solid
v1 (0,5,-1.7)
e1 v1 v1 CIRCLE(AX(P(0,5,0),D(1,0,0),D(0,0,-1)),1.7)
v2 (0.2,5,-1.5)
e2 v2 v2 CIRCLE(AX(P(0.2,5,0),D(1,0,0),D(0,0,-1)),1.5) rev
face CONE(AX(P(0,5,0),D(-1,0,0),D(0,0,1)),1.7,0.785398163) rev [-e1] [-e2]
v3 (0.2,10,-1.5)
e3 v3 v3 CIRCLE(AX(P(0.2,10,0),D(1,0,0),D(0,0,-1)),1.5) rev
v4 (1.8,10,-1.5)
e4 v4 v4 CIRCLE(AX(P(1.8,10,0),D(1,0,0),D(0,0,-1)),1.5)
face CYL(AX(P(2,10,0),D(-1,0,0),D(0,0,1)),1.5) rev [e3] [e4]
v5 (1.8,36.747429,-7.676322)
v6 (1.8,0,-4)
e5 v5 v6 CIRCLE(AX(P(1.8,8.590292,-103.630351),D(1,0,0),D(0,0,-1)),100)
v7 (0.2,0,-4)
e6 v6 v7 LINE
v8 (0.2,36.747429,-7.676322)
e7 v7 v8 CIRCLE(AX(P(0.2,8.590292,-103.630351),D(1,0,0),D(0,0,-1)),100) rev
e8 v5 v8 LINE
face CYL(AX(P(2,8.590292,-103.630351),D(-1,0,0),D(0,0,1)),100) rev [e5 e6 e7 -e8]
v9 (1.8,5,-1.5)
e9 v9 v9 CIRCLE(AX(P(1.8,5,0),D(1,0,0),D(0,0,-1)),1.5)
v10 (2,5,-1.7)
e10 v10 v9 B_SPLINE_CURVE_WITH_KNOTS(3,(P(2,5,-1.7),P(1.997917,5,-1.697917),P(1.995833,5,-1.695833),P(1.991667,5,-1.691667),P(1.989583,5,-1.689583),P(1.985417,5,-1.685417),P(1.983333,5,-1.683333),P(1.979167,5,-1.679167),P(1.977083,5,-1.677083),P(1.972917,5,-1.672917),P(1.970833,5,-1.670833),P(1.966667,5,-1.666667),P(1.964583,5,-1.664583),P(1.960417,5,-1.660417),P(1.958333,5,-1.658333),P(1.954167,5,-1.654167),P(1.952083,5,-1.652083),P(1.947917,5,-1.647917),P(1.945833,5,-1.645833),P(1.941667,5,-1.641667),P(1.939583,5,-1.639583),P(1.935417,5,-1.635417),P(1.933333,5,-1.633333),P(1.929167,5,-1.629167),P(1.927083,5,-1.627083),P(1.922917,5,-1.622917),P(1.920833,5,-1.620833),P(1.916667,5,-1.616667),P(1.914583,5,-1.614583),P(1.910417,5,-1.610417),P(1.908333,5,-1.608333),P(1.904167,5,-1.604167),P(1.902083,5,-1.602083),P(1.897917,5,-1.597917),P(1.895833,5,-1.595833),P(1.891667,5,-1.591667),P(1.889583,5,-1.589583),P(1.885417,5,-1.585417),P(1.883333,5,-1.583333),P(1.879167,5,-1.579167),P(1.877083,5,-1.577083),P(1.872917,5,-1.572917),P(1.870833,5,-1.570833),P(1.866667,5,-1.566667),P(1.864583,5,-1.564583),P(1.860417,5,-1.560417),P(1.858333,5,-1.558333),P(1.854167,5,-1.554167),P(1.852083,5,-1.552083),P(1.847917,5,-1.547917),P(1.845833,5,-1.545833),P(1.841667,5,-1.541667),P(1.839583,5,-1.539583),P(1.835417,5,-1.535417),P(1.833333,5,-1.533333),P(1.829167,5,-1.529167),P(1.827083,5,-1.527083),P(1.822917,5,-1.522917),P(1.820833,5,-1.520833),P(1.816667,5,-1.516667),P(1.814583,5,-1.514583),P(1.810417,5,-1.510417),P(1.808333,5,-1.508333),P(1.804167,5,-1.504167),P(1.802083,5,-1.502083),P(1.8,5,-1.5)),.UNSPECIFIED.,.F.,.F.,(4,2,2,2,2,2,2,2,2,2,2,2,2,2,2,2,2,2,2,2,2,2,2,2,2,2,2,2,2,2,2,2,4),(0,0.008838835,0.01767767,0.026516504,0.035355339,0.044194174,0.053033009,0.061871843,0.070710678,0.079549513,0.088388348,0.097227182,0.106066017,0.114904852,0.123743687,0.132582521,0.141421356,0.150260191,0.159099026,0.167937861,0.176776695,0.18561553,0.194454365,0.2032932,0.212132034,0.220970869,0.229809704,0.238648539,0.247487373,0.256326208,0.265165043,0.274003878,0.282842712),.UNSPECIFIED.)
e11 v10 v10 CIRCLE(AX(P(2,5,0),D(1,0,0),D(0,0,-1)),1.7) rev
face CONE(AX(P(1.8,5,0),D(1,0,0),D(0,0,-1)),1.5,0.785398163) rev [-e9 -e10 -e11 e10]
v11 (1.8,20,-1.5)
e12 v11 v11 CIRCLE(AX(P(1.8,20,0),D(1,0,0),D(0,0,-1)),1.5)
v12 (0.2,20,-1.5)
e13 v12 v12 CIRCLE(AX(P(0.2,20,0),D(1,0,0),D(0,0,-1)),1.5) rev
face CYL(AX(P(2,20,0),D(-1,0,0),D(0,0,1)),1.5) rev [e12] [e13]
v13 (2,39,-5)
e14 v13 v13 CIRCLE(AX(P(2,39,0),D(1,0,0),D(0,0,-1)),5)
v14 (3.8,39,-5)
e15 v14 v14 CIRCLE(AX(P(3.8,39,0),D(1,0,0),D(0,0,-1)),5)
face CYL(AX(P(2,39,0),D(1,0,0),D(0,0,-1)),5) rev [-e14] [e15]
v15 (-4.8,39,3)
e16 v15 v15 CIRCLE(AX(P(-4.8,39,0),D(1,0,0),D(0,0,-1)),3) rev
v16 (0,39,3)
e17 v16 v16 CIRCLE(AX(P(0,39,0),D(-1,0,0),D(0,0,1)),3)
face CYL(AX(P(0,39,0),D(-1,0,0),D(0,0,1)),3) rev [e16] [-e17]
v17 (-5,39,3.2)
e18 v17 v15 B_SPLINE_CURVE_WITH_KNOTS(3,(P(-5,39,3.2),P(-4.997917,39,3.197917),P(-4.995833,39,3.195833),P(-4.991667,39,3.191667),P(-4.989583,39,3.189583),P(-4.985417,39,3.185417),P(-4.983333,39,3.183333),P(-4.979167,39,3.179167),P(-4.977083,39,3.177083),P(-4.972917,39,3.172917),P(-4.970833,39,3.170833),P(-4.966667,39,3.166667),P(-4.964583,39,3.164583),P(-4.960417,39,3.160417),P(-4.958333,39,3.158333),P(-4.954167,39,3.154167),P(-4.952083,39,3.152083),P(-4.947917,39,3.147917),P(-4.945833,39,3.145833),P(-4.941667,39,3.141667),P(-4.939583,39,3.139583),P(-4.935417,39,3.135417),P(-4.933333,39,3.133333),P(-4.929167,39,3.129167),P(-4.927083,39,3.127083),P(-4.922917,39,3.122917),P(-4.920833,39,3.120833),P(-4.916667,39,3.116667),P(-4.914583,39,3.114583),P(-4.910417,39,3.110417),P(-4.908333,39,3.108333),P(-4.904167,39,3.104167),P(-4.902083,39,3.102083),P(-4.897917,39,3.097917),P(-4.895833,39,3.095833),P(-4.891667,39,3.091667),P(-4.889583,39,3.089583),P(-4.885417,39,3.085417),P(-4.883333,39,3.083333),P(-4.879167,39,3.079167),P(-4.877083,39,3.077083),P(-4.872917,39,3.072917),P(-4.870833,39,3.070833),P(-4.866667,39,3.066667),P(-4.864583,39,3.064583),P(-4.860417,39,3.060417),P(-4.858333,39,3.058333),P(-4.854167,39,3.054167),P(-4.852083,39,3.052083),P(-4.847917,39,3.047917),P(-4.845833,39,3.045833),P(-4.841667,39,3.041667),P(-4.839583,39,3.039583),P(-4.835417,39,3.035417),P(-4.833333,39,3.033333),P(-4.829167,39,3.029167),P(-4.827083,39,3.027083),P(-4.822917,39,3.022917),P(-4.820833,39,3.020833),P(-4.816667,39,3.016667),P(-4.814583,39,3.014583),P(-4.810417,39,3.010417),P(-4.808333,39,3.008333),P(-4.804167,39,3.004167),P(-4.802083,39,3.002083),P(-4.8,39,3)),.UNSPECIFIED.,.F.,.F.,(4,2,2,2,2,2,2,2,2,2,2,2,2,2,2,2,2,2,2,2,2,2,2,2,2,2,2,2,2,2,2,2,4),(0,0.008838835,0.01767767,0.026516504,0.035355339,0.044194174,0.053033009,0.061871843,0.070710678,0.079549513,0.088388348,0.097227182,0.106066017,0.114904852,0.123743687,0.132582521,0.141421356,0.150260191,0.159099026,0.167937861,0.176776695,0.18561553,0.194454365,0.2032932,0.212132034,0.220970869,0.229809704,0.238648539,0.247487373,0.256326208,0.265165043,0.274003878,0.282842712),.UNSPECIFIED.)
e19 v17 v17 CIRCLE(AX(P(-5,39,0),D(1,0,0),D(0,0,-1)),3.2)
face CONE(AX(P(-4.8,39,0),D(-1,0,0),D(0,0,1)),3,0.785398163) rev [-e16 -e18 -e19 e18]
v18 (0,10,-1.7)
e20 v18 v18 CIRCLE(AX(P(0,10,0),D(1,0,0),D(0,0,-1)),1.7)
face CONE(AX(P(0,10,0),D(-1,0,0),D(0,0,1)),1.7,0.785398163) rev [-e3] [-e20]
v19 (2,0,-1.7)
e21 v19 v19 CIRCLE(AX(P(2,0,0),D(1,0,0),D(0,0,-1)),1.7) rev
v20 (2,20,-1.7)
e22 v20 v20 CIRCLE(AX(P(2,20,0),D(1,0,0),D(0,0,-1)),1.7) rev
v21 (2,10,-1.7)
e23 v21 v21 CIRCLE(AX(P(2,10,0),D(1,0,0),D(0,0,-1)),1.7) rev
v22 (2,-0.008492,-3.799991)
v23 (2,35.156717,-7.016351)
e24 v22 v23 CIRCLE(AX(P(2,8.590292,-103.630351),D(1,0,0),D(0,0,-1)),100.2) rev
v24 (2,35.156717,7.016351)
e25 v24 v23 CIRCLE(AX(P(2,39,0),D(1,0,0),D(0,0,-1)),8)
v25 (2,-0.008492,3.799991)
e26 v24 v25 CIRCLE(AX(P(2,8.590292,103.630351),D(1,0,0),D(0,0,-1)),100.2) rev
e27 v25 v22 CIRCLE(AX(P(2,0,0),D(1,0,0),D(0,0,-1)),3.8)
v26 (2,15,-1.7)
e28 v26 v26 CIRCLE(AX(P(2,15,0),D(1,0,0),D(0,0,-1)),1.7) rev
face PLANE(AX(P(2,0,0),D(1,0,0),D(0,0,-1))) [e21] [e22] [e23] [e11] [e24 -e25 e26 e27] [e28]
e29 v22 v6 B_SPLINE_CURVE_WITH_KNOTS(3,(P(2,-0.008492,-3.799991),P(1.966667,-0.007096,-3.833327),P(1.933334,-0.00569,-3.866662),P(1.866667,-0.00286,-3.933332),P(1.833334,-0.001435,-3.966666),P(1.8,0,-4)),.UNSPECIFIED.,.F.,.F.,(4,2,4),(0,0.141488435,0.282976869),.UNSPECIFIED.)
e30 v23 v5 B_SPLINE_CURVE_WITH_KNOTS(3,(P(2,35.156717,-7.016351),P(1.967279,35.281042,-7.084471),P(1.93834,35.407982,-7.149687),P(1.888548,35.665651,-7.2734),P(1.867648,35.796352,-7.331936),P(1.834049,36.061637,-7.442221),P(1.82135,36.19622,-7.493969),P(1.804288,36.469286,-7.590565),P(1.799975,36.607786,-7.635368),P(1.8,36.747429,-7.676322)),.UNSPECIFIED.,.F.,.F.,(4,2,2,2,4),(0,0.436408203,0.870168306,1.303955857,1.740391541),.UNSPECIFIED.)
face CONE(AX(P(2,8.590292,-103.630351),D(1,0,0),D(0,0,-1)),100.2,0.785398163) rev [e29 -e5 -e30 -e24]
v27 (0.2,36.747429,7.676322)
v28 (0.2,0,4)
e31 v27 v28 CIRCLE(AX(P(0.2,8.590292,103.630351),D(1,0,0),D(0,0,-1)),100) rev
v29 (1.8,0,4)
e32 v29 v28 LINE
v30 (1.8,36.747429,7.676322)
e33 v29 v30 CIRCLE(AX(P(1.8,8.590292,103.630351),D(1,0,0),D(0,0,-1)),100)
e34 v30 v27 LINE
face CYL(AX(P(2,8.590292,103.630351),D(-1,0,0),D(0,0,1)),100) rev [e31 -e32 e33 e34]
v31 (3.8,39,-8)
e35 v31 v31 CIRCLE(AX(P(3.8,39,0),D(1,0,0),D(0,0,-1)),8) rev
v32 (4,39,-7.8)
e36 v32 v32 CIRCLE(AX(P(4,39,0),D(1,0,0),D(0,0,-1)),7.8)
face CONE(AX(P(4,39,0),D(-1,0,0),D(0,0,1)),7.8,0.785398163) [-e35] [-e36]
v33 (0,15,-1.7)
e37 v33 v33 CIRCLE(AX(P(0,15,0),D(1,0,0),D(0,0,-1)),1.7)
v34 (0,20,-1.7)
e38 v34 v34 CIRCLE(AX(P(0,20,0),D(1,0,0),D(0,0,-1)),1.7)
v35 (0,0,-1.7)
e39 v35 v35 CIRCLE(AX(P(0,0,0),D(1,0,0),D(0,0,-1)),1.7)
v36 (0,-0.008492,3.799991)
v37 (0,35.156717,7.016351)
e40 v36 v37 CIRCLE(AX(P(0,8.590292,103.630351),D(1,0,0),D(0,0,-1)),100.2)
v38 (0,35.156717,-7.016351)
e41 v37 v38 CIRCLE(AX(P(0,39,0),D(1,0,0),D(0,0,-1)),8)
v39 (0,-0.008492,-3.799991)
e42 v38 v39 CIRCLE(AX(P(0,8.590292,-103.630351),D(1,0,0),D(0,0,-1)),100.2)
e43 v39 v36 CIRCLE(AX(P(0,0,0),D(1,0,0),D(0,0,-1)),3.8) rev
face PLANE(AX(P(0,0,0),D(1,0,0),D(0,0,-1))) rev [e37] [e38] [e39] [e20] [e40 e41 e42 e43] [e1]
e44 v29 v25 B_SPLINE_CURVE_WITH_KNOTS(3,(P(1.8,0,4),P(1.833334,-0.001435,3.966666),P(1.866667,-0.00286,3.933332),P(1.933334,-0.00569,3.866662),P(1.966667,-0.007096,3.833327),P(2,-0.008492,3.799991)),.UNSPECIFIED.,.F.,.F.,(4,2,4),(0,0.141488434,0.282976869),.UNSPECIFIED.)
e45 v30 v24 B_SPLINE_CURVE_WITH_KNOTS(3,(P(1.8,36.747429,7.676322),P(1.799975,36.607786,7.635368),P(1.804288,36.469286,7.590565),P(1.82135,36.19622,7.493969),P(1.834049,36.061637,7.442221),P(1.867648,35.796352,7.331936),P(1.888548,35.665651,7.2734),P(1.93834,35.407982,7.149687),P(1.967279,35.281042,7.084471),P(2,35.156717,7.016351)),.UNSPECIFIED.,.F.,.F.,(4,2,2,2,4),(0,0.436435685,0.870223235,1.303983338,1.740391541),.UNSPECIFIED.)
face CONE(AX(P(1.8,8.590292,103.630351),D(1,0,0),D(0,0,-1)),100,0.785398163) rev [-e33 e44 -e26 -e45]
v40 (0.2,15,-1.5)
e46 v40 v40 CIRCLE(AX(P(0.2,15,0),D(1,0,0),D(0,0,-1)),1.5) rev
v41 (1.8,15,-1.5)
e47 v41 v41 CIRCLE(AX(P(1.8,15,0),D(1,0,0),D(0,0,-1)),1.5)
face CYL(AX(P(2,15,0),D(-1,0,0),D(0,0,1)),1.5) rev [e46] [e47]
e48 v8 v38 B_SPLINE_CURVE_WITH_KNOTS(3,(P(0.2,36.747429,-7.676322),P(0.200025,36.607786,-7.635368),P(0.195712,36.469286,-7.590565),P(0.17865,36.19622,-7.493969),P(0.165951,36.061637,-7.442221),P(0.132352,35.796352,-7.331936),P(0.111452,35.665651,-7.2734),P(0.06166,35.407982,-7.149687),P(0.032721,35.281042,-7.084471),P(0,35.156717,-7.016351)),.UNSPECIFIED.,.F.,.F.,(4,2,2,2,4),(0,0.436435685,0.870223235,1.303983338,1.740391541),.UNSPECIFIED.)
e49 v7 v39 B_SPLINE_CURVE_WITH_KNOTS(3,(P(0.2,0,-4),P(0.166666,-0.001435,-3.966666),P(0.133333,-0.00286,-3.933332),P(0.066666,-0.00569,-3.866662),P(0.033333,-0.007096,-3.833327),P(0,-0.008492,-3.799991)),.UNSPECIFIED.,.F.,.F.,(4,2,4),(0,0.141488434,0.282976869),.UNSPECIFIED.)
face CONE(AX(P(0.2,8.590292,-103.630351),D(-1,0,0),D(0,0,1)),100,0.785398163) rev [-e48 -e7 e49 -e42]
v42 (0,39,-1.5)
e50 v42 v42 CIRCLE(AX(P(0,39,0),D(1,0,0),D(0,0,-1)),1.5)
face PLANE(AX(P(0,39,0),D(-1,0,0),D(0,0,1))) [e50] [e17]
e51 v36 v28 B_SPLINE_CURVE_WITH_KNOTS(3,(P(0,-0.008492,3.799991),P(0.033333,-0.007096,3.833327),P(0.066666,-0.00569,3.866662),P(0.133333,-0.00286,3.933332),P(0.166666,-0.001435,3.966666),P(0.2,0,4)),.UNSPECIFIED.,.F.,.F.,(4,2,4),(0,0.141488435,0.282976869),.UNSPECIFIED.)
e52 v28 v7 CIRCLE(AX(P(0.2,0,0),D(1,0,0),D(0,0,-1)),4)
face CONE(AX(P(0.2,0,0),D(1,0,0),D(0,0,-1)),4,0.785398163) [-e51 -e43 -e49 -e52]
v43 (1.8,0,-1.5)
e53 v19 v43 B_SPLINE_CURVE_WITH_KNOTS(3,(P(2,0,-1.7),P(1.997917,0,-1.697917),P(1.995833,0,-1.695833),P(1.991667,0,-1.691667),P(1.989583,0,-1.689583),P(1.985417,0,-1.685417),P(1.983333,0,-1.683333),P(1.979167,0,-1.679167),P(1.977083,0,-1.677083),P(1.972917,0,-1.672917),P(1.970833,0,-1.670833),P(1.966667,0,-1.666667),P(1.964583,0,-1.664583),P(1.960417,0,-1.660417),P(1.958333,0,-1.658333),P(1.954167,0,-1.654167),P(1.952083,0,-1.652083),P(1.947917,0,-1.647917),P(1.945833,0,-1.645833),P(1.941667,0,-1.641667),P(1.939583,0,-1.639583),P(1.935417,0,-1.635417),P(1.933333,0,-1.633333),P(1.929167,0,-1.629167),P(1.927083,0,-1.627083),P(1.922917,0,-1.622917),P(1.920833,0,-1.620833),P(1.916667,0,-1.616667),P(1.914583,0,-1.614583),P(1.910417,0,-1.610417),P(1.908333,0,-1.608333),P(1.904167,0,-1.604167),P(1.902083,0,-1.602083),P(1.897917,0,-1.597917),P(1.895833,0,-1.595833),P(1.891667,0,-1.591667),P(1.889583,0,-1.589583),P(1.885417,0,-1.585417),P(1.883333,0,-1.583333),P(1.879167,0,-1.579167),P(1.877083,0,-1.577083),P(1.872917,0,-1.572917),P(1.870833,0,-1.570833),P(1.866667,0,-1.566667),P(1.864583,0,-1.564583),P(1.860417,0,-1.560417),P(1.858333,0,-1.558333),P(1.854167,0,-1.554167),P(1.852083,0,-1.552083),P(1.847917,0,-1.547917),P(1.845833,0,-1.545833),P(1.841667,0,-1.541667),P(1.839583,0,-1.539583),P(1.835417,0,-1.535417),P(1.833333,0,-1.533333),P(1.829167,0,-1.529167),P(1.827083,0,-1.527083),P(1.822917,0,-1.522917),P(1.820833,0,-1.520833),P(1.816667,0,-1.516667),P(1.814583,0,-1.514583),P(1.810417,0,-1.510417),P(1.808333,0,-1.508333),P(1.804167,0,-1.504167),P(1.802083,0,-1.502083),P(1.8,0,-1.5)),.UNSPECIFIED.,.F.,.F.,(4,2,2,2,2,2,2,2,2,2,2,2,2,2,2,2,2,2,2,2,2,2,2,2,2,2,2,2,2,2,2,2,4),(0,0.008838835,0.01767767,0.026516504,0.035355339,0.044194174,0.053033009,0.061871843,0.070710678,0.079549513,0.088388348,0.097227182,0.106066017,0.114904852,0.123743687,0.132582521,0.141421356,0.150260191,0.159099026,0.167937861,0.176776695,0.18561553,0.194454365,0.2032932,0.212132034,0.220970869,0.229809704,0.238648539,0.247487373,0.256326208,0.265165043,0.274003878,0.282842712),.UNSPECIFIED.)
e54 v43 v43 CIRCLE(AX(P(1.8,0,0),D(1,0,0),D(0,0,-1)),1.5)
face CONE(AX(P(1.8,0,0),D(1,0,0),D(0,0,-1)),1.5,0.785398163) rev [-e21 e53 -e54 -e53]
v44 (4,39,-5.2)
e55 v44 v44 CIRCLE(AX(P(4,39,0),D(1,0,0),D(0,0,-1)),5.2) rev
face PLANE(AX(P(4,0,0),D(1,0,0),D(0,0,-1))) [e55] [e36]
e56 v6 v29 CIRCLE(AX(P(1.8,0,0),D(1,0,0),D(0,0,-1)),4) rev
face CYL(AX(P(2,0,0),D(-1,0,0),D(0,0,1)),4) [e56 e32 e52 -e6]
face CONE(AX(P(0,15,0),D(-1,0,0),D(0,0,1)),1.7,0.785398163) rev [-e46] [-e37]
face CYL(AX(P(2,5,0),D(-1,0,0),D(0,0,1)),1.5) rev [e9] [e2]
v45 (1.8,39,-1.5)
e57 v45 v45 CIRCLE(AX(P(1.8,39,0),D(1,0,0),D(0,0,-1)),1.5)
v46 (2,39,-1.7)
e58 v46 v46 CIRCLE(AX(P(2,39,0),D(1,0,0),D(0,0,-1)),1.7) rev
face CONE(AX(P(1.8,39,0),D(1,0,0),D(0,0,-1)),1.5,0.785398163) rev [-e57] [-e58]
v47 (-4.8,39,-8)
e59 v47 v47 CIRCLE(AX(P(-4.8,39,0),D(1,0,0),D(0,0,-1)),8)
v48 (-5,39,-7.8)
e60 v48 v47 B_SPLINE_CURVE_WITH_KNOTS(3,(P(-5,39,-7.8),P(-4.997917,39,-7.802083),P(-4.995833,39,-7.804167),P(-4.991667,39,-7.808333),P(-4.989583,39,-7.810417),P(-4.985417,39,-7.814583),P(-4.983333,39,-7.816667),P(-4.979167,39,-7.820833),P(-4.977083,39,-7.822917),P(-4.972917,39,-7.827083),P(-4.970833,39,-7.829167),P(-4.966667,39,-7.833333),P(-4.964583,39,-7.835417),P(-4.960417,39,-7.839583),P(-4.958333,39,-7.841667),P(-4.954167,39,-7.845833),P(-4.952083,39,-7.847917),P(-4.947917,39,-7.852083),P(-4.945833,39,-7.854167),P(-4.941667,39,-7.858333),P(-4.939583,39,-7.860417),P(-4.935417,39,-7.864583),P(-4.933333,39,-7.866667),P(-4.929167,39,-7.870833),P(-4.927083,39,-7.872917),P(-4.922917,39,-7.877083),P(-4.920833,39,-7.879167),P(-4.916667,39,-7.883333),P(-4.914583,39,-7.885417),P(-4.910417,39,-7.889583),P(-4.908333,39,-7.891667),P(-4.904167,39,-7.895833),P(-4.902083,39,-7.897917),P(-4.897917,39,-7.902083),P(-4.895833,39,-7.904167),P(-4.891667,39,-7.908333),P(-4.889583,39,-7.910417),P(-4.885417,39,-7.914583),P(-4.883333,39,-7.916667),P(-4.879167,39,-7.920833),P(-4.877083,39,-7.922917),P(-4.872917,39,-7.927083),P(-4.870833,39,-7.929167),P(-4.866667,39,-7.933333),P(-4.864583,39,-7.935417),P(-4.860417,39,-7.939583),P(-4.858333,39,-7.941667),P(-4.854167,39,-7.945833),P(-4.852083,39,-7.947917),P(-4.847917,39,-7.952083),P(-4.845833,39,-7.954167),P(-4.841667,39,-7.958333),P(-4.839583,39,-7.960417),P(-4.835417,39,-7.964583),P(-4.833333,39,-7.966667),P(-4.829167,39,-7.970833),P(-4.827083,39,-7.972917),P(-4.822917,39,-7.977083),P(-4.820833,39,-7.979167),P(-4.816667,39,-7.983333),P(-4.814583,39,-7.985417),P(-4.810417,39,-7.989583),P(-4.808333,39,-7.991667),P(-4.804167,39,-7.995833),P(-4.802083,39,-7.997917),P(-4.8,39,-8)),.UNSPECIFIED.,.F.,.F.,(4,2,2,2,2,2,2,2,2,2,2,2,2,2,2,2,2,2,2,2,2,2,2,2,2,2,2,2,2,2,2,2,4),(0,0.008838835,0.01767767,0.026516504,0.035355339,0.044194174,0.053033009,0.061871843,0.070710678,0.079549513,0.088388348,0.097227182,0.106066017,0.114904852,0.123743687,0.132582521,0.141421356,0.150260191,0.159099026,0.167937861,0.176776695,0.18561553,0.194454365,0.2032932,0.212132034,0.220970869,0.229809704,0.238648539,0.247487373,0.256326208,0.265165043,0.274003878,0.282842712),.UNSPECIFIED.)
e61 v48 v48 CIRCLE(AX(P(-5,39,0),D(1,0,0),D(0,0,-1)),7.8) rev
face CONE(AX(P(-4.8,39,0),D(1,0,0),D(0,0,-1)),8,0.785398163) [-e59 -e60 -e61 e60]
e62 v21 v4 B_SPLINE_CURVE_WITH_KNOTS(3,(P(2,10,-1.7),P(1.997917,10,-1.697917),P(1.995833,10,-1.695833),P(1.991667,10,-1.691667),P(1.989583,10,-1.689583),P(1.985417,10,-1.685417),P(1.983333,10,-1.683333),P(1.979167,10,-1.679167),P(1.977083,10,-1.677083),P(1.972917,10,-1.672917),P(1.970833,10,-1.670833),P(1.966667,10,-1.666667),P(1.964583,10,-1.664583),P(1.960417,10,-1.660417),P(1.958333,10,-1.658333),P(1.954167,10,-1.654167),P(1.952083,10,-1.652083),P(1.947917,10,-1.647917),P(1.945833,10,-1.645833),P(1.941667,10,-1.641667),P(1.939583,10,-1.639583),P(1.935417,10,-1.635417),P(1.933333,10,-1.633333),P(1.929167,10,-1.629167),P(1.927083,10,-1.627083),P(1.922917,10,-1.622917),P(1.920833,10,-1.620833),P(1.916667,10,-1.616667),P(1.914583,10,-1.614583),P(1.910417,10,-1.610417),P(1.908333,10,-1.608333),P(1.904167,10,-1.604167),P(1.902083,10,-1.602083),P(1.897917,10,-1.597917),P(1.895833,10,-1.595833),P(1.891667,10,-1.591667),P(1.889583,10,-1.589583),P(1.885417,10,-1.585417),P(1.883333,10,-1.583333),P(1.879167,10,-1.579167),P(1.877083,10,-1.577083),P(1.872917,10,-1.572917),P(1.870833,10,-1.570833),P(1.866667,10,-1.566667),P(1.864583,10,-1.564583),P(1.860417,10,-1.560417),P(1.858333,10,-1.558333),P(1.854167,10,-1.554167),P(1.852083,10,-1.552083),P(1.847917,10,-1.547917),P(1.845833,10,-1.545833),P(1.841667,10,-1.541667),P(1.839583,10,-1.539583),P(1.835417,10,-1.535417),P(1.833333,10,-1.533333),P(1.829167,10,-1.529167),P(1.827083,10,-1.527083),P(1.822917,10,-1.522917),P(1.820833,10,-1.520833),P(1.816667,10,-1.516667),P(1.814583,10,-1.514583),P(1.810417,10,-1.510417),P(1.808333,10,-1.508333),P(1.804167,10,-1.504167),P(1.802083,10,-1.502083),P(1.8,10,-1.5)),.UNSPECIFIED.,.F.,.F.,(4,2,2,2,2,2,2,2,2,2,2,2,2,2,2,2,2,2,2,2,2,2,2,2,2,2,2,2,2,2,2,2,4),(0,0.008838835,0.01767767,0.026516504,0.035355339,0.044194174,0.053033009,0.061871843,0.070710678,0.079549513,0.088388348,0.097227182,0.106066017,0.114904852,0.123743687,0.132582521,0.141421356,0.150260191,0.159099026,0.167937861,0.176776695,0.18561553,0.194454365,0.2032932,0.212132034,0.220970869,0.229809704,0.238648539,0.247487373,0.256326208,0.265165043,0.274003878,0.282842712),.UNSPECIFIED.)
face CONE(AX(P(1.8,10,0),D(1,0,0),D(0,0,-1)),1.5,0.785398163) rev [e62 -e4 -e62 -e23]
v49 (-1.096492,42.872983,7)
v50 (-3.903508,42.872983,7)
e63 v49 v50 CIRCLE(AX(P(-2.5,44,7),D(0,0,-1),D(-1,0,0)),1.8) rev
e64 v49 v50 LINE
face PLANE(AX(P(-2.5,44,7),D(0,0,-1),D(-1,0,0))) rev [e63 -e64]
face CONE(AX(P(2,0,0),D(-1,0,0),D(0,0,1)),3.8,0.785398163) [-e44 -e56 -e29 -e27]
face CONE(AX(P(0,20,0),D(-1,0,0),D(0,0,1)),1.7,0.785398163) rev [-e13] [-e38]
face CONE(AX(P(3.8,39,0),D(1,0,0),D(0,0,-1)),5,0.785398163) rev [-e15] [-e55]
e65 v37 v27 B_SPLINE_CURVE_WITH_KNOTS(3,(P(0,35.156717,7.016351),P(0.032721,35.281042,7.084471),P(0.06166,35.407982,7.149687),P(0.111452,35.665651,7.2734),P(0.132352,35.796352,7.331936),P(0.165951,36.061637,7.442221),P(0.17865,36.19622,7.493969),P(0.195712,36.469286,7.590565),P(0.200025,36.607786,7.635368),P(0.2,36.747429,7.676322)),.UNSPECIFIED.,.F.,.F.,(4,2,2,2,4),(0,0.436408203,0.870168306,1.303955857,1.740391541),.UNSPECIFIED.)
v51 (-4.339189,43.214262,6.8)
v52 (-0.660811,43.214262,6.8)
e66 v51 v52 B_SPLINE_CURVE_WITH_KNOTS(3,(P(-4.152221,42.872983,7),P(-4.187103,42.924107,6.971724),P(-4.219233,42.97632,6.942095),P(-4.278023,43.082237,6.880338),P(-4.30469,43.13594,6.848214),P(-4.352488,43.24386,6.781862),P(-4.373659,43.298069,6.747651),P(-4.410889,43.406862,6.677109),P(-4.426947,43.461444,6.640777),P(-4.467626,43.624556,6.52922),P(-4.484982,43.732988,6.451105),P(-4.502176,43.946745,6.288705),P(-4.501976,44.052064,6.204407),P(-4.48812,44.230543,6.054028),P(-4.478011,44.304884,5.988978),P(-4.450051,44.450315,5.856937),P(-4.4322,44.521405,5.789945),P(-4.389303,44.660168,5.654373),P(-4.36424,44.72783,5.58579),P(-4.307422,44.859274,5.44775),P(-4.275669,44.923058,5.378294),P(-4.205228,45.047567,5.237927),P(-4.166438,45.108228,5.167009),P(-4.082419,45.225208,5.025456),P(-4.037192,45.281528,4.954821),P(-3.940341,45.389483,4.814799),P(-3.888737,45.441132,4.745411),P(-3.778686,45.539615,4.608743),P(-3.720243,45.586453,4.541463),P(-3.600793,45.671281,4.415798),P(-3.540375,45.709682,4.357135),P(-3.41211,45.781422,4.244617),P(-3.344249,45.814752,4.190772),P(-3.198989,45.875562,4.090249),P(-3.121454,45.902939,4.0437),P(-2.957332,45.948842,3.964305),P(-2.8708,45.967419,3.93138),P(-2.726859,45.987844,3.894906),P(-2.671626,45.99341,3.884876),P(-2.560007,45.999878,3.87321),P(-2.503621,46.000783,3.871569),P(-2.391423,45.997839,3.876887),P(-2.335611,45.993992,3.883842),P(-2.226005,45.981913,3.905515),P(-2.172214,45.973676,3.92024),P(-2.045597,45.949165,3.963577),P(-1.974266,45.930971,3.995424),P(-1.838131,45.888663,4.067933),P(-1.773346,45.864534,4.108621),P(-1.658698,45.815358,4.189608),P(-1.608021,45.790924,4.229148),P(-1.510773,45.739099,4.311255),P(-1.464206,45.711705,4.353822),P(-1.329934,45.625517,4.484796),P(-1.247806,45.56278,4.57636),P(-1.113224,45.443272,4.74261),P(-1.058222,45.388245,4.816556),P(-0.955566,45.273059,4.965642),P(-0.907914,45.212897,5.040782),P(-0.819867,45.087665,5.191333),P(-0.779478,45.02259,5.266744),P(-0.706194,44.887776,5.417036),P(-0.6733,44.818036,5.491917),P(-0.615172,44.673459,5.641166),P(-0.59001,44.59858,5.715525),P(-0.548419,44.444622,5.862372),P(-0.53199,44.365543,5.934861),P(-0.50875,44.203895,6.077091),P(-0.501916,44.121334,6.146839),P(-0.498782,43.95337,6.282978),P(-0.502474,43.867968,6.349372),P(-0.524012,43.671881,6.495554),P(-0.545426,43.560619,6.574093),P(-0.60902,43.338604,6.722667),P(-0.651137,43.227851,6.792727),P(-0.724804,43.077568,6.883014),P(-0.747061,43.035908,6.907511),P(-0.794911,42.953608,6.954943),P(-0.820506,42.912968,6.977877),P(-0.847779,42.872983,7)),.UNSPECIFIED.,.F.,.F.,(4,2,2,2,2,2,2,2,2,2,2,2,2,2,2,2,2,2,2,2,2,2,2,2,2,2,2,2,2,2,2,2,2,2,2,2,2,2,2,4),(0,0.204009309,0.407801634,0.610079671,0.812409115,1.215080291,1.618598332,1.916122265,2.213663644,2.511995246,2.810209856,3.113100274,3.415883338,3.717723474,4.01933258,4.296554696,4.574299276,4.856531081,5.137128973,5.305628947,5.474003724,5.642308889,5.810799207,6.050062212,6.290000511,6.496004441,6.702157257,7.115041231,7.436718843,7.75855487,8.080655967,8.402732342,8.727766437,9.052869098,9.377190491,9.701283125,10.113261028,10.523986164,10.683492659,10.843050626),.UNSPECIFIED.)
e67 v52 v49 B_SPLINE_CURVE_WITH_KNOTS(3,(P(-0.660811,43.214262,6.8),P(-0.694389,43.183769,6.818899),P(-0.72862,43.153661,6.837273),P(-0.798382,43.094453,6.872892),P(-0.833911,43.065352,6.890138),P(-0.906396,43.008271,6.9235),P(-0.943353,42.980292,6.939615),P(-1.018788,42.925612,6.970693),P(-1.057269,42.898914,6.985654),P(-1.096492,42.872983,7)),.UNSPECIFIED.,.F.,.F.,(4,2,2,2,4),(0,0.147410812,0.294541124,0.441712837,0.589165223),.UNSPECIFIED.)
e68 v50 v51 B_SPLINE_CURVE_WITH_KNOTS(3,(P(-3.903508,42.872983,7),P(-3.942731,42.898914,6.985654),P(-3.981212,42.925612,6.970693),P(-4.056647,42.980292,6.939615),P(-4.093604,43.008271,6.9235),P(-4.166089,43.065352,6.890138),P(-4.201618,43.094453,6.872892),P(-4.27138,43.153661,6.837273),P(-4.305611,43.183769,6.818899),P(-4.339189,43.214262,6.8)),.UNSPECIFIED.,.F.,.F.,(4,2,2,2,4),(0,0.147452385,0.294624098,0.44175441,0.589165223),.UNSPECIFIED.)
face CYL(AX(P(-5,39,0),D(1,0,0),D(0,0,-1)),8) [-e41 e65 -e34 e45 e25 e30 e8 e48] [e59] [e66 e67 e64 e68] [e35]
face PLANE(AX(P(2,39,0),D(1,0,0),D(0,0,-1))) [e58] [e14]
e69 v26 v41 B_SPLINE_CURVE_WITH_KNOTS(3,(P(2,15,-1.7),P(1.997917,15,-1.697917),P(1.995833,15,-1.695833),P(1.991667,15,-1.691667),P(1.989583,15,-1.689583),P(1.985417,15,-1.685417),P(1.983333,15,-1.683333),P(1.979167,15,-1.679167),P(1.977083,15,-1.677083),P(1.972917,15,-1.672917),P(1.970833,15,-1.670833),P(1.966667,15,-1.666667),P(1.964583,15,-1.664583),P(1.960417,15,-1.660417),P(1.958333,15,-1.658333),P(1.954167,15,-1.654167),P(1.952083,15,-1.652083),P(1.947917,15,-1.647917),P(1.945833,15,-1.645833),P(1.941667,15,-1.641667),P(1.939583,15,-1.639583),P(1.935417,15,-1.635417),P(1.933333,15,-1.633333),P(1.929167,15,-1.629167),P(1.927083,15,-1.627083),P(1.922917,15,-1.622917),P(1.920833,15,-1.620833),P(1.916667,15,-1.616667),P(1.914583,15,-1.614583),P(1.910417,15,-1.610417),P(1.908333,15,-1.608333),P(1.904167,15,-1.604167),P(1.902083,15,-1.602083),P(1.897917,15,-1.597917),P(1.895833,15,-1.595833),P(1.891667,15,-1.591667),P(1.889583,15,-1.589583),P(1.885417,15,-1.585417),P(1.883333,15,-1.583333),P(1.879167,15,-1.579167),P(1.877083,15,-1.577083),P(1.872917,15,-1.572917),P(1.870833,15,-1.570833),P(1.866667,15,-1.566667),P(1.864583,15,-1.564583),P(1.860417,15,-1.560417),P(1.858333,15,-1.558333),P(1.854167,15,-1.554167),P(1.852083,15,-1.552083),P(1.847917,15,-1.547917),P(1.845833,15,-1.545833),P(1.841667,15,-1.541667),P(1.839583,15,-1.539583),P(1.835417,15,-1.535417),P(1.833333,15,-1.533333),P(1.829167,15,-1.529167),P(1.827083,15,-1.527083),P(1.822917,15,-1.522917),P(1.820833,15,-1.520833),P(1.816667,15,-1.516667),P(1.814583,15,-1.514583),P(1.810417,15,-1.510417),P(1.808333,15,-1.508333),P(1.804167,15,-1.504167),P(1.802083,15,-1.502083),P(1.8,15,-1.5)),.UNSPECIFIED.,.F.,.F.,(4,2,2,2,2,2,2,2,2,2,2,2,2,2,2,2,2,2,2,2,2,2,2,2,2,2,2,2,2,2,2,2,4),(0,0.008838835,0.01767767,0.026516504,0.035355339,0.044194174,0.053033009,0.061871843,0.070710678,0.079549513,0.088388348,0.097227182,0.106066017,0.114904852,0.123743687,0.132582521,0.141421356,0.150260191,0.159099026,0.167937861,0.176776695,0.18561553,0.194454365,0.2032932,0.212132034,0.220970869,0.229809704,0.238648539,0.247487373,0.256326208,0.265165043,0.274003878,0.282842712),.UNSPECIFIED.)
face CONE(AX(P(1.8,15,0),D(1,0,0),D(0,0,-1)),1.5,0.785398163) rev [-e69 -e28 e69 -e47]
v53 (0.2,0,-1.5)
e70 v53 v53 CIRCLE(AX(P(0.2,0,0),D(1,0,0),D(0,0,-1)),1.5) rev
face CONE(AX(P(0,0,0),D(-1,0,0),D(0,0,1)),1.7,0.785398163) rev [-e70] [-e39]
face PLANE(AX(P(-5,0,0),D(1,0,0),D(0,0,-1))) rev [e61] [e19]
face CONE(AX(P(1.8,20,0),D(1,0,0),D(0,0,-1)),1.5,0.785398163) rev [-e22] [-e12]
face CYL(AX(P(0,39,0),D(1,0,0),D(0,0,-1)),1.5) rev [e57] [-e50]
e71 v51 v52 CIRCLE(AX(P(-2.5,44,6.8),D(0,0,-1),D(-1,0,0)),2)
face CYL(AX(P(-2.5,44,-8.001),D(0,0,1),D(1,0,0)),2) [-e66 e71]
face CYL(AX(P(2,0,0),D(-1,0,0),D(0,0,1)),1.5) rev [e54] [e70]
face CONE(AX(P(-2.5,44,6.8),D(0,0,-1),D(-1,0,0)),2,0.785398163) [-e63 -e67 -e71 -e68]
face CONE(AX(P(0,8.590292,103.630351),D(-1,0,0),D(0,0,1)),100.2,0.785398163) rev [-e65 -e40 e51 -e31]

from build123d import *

# Parameters (mm, degrees)
EXTRUDE_1_DEPTH      = 2
EXTRUDE_2_DEPTH      = 4
EXTRUDE_2_DEPTH_BACK = 5
SKETCH_3_R           = 5
CUT_EXTRUDE_1_DEPTH  = 2
SKETCH_4_R           = 1.5
CUT_EXTRUDE_2_DEPTH  = 2
SKETCH_5_R           = 3
CUT_EXTRUDE_3_DEPTH  = 5
EXTRUDE_3_REACH      = 51.588
CHAMFER_1_SIZE       = 0.2
CHAMFER_2_SIZE       = 0.2
CHAMFER_3_SIZE       = 0.2
CHAMFER_4_ANGLE      = 180
CHAMFER_5_SIZE       = 0.2


with BuildPart() as part:
    # 草图1 → 凸台-拉伸1 (new body)
    with BuildSketch(Plane(origin=(0, 0, 0), x_dir=(0, 0, -1), z_dir=(1, 0, 0))):
        with BuildLine():
            ThreePointArc((-4, 0), (-2.828427125, -2.828427125), (0, -4))
            Line((0, -4), (0, -1.5))
            ThreePointArc((0, -1.5), (-1.5, 0), (0, 1.5))
            Line((0, 1.5), (0, 3.5))
            ThreePointArc((0, 3.5), (-1.5, 5), (0, 6.5))
            Line((0, 6.5), (0, 8.5))
            ThreePointArc((0, 8.5), (-1.5, 10), (0, 11.5))
            Line((0, 11.5), (0, 13.5))
            ThreePointArc((0, 13.5), (-1.5, 15), (0, 16.5))
            Line((0, 16.5), (0, 18.5))
            ThreePointArc((0, 18.5), (-1.5, 20), (0, 21.5))
            Line((0, 21.5), (0, 31))
            ThreePointArc((0, 31), (-4.794759251, 32.596072789), (-7.67632231, 36.747429069))
            ThreePointArc((-7.67632231, 36.747429069), (-4.127055678, 18.544898625), (-4, 0))
        make_face()
        with BuildLine():
            Line((0, -1.5), (0, -4))
            ThreePointArc((0, -4), (2.828427125, -2.828427125), (4, 0))
            ThreePointArc((4, 0), (4.127055678, 18.544898625), (7.67632231, 36.747429069))
            ThreePointArc((7.67632231, 36.747429069), (4.794759251, 32.596072789), (0, 31))
            Line((0, 31), (0, 21.5))
            ThreePointArc((0, 21.5), (1.060660172, 21.060660172), (1.5, 20))
            ThreePointArc((1.5, 20), (1.060660172, 18.939339828), (0, 18.5))
            Line((0, 18.5), (0, 16.5))
            ThreePointArc((0, 16.5), (1.060660172, 16.060660172), (1.5, 15))
            ThreePointArc((1.5, 15), (1.060660172, 13.939339828), (0, 13.5))
            Line((0, 13.5), (0, 11.5))
            ThreePointArc((0, 11.5), (1.060660172, 11.060660172), (1.5, 10))
            ThreePointArc((1.5, 10), (1.060660172, 8.939339828), (0, 8.5))
            Line((0, 8.5), (0, 6.5))
            ThreePointArc((0, 6.5), (1.060660172, 6.060660172), (1.5, 5))
            ThreePointArc((1.5, 5), (1.060660172, 3.939339828), (0, 3.5))
            Line((0, 3.5), (0, 1.5))
            ThreePointArc((0, 1.5), (1.060660172, 1.060660172), (1.5, 0))
            ThreePointArc((1.5, 0), (1.060660172, -1.060660172), (0, -1.5))
        make_face()
    extrude(amount=EXTRUDE_1_DEPTH)

    # 草图2 → 凸台-拉伸2 (add, two sides: drawn at the far end of the back side and taken through both)
    with BuildSketch(Plane(origin=(0, 0, 0), x_dir=(0, 0, -1), z_dir=(1, 0, 0)).offset(-EXTRUDE_2_DEPTH_BACK)):
        with BuildLine():
            ThreePointArc((0, 47), (-8, 39), (0, 31))
            Line((0, 31), (0, 47))
        make_face()
        with BuildLine():
            Line((0, 47), (0, 31))
            ThreePointArc((0, 31), (5.656854249, 33.343145751), (8, 39))
            ThreePointArc((8, 39), (5.656854249, 44.656854249), (0, 47))
        make_face()
    extrude(amount=EXTRUDE_2_DEPTH + EXTRUDE_2_DEPTH_BACK)

    # 草图3 → 切除-拉伸1 (cut)
    with BuildSketch(Plane(origin=(4, 0, 0), x_dir=(0, 0, -1), z_dir=(1, 0, 0))):
        with Locations((0, 39)):
            Circle(SKETCH_3_R)
    extrude(amount=-CUT_EXTRUDE_1_DEPTH, mode=Mode.SUBTRACT)

    # 草图4 → 切除-拉伸2 (cut)
    with BuildSketch(Plane(origin=(2, 0, 0), x_dir=(0, 0, -1), z_dir=(1, 0, 0))):
        with Locations((0, 39)):
            Circle(SKETCH_4_R)
    extrude(amount=-CUT_EXTRUDE_2_DEPTH, mode=Mode.SUBTRACT)

    # 草图5 → 切除-拉伸3 (cut)
    with BuildSketch(Plane.ZY.offset(5)):
        with Locations((0, 39)):
            Circle(SKETCH_5_R)
    extrude(amount=-CUT_EXTRUDE_3_DEPTH, mode=Mode.SUBTRACT)

    # 草图7 → 凸台-拉伸3 (add, up to next)
    with BuildSketch(Plane.XY.offset(7), mode=Mode.PRIVATE) as extrude_3_sk1:
        with BuildLine():
            Line((-4.005881134, 42.683822956), (-0.994118866, 42.683822956))
            ThreePointArc((-0.994118866, 42.683822956), (-2.5, 46), (-4.005881134, 42.683822956))
        make_face()
    extrude_3_tool1 = extrude(extrude_3_sk1.sketch, amount=-EXTRUDE_3_REACH, mode=Mode.PRIVATE) - part.part
    add(extrude_3_tool1.solids().sort_by_distance((-2.5, 44.204391, 7))[0])

    # 倒角1
    chamfer_1_edges = [part.edges().sort_by_distance(p)[0] for p in [
        (-5, 39, -3),
        (4, 31, 0),
        (-5, 31, 0),
        (-2.5, 46, 7),
        (4, 39, 5),
    ]]
    chamfer(chamfer_1_edges, length=CHAMFER_1_SIZE)

    # 倒角2
    chamfer_2_edges = [part.edges().sort_by_distance(p)[0] for p in [
        (2, 1.5, 0),
        (0, 21.5, 0),
        (0, 16.5, 0),
        (0, 11.5, 0),
        (2, 6.5, 0),
        (0, 6.5, 0),
        (0, 1.5, 0),
        (2, 11.5, 0),
        (2, 16.5, 0),
        (2, 21.5, 0),
    ]]
    chamfer(chamfer_2_edges, length=CHAMFER_2_SIZE)

    # 倒角3
    # the kernel refuses this chamfer: 0.2 mm, written as the material it takes off along each edge
    with BuildSketch(Plane(origin=(0, 8.590292429, 103.630351179), x_dir=(0, 0.3061524264248754, -0.9519825060336777), z_dir=(0, 0.9519825060336777, 0.3061524264248754))) as chamfer_3_piece_1_section:
        Polygon((100 + CHAMFER_3_SIZE, 0), (100, -CHAMFER_3_SIZE), (100, 0), align=None)
    chamfer_3_piece_1 = revolve(axis=Axis((0, 8.590292429, 103.630351179), (-1, 0, 0)), revolution_arc=23.639557958, mode=Mode.PRIVATE)
    chamfer_3_piece_1 = chamfer_3_piece_1 - Plane(origin=(0, 39, 0), x_dir=(0, 1, 0), z_dir=(-1, 0, 0)) * Cylinder(8, 401, mode=Mode.PRIVATE)
    add(chamfer_3_piece_1, mode=Mode.SUBTRACT)
    with BuildSketch(Plane(origin=(0, 8.590292429, -103.630351179), x_dir=(0, -0.10126549371899889, 0.9948594371979629), z_dir=(0, -0.9948594371979629, -0.10126549371899889))) as chamfer_3_piece_2_section:
        Polygon((100 + CHAMFER_3_SIZE, 0), (100, -CHAMFER_3_SIZE), (100, 0), align=None)
    chamfer_3_piece_2 = revolve(axis=Axis((0, 8.590292429, -103.630351179), (-1, 0, 0)), revolution_arc=23.639557958, mode=Mode.PRIVATE)
    chamfer_3_piece_2 = chamfer_3_piece_2 - Plane(origin=(0, 39, 0), x_dir=(0, 1, 0), z_dir=(-1, 0, 0)) * Cylinder(8, 401, mode=Mode.PRIVATE)
    add(chamfer_3_piece_2, mode=Mode.SUBTRACT)
    with BuildSketch(Plane(origin=(2, 8.590292429, -103.630351179), x_dir=(0, -0.10126549371899889, 0.9948594371979629), z_dir=(0, -0.9948594371979629, -0.10126549371899889))) as chamfer_3_piece_3_section:
        Polygon((100, CHAMFER_3_SIZE), (100 + CHAMFER_3_SIZE, 0), (100, 0), align=None)
    chamfer_3_piece_3 = revolve(axis=Axis((2, 8.590292429, -103.630351179), (-1, 0, 0)), revolution_arc=23.639557958, mode=Mode.PRIVATE)
    chamfer_3_piece_3 = chamfer_3_piece_3 - Plane(origin=(2, 39, 0), x_dir=(0, 1, 0), z_dir=(-1, 0, 0)) * Cylinder(8, 401, mode=Mode.PRIVATE)
    add(chamfer_3_piece_3, mode=Mode.SUBTRACT)
    with BuildSketch(Plane(origin=(2, 8.590292429, 103.630351179), x_dir=(0, 0.3061524264248754, -0.9519825060336777), z_dir=(0, 0.9519825060336777, 0.3061524264248754))) as chamfer_3_piece_4_section:
        Polygon((100, CHAMFER_3_SIZE), (100 + CHAMFER_3_SIZE, 0), (100, 0), align=None)
    chamfer_3_piece_4 = revolve(axis=Axis((2, 8.590292429, 103.630351179), (-1, 0, 0)), revolution_arc=23.639557958, mode=Mode.PRIVATE)
    chamfer_3_piece_4 = chamfer_3_piece_4 - Plane(origin=(2, 39, 0), x_dir=(0, 1, 0), z_dir=(-1, 0, 0)) * Cylinder(8, 401, mode=Mode.PRIVATE)
    add(chamfer_3_piece_4, mode=Mode.SUBTRACT)

    # 倒角4: read off the stored shape, not the designer's step
    # 倒角4 outline → 倒角4 (revolve, cut)
    with BuildSketch(Plane.ZX):
        Polygon((4, 2), (3.8, 2), (4, 1.8), align=None)
        Polygon((4, 0), (4, 0.2), (3.8, 0), align=None)
    revolve(axis=Axis((0, 0, 0), (1, 0, 0)), revolution_arc=CHAMFER_4_ANGLE, mode=Mode.SUBTRACT)

    # 倒角5
    chamfer_5_edges = [part.edges().sort_by_distance(p)[0] for p in [
        (2, 39, 1.5),
    ]]
    chamfer(chamfer_5_edges, length=CHAMFER_5_SIZE)


solid = part.part
